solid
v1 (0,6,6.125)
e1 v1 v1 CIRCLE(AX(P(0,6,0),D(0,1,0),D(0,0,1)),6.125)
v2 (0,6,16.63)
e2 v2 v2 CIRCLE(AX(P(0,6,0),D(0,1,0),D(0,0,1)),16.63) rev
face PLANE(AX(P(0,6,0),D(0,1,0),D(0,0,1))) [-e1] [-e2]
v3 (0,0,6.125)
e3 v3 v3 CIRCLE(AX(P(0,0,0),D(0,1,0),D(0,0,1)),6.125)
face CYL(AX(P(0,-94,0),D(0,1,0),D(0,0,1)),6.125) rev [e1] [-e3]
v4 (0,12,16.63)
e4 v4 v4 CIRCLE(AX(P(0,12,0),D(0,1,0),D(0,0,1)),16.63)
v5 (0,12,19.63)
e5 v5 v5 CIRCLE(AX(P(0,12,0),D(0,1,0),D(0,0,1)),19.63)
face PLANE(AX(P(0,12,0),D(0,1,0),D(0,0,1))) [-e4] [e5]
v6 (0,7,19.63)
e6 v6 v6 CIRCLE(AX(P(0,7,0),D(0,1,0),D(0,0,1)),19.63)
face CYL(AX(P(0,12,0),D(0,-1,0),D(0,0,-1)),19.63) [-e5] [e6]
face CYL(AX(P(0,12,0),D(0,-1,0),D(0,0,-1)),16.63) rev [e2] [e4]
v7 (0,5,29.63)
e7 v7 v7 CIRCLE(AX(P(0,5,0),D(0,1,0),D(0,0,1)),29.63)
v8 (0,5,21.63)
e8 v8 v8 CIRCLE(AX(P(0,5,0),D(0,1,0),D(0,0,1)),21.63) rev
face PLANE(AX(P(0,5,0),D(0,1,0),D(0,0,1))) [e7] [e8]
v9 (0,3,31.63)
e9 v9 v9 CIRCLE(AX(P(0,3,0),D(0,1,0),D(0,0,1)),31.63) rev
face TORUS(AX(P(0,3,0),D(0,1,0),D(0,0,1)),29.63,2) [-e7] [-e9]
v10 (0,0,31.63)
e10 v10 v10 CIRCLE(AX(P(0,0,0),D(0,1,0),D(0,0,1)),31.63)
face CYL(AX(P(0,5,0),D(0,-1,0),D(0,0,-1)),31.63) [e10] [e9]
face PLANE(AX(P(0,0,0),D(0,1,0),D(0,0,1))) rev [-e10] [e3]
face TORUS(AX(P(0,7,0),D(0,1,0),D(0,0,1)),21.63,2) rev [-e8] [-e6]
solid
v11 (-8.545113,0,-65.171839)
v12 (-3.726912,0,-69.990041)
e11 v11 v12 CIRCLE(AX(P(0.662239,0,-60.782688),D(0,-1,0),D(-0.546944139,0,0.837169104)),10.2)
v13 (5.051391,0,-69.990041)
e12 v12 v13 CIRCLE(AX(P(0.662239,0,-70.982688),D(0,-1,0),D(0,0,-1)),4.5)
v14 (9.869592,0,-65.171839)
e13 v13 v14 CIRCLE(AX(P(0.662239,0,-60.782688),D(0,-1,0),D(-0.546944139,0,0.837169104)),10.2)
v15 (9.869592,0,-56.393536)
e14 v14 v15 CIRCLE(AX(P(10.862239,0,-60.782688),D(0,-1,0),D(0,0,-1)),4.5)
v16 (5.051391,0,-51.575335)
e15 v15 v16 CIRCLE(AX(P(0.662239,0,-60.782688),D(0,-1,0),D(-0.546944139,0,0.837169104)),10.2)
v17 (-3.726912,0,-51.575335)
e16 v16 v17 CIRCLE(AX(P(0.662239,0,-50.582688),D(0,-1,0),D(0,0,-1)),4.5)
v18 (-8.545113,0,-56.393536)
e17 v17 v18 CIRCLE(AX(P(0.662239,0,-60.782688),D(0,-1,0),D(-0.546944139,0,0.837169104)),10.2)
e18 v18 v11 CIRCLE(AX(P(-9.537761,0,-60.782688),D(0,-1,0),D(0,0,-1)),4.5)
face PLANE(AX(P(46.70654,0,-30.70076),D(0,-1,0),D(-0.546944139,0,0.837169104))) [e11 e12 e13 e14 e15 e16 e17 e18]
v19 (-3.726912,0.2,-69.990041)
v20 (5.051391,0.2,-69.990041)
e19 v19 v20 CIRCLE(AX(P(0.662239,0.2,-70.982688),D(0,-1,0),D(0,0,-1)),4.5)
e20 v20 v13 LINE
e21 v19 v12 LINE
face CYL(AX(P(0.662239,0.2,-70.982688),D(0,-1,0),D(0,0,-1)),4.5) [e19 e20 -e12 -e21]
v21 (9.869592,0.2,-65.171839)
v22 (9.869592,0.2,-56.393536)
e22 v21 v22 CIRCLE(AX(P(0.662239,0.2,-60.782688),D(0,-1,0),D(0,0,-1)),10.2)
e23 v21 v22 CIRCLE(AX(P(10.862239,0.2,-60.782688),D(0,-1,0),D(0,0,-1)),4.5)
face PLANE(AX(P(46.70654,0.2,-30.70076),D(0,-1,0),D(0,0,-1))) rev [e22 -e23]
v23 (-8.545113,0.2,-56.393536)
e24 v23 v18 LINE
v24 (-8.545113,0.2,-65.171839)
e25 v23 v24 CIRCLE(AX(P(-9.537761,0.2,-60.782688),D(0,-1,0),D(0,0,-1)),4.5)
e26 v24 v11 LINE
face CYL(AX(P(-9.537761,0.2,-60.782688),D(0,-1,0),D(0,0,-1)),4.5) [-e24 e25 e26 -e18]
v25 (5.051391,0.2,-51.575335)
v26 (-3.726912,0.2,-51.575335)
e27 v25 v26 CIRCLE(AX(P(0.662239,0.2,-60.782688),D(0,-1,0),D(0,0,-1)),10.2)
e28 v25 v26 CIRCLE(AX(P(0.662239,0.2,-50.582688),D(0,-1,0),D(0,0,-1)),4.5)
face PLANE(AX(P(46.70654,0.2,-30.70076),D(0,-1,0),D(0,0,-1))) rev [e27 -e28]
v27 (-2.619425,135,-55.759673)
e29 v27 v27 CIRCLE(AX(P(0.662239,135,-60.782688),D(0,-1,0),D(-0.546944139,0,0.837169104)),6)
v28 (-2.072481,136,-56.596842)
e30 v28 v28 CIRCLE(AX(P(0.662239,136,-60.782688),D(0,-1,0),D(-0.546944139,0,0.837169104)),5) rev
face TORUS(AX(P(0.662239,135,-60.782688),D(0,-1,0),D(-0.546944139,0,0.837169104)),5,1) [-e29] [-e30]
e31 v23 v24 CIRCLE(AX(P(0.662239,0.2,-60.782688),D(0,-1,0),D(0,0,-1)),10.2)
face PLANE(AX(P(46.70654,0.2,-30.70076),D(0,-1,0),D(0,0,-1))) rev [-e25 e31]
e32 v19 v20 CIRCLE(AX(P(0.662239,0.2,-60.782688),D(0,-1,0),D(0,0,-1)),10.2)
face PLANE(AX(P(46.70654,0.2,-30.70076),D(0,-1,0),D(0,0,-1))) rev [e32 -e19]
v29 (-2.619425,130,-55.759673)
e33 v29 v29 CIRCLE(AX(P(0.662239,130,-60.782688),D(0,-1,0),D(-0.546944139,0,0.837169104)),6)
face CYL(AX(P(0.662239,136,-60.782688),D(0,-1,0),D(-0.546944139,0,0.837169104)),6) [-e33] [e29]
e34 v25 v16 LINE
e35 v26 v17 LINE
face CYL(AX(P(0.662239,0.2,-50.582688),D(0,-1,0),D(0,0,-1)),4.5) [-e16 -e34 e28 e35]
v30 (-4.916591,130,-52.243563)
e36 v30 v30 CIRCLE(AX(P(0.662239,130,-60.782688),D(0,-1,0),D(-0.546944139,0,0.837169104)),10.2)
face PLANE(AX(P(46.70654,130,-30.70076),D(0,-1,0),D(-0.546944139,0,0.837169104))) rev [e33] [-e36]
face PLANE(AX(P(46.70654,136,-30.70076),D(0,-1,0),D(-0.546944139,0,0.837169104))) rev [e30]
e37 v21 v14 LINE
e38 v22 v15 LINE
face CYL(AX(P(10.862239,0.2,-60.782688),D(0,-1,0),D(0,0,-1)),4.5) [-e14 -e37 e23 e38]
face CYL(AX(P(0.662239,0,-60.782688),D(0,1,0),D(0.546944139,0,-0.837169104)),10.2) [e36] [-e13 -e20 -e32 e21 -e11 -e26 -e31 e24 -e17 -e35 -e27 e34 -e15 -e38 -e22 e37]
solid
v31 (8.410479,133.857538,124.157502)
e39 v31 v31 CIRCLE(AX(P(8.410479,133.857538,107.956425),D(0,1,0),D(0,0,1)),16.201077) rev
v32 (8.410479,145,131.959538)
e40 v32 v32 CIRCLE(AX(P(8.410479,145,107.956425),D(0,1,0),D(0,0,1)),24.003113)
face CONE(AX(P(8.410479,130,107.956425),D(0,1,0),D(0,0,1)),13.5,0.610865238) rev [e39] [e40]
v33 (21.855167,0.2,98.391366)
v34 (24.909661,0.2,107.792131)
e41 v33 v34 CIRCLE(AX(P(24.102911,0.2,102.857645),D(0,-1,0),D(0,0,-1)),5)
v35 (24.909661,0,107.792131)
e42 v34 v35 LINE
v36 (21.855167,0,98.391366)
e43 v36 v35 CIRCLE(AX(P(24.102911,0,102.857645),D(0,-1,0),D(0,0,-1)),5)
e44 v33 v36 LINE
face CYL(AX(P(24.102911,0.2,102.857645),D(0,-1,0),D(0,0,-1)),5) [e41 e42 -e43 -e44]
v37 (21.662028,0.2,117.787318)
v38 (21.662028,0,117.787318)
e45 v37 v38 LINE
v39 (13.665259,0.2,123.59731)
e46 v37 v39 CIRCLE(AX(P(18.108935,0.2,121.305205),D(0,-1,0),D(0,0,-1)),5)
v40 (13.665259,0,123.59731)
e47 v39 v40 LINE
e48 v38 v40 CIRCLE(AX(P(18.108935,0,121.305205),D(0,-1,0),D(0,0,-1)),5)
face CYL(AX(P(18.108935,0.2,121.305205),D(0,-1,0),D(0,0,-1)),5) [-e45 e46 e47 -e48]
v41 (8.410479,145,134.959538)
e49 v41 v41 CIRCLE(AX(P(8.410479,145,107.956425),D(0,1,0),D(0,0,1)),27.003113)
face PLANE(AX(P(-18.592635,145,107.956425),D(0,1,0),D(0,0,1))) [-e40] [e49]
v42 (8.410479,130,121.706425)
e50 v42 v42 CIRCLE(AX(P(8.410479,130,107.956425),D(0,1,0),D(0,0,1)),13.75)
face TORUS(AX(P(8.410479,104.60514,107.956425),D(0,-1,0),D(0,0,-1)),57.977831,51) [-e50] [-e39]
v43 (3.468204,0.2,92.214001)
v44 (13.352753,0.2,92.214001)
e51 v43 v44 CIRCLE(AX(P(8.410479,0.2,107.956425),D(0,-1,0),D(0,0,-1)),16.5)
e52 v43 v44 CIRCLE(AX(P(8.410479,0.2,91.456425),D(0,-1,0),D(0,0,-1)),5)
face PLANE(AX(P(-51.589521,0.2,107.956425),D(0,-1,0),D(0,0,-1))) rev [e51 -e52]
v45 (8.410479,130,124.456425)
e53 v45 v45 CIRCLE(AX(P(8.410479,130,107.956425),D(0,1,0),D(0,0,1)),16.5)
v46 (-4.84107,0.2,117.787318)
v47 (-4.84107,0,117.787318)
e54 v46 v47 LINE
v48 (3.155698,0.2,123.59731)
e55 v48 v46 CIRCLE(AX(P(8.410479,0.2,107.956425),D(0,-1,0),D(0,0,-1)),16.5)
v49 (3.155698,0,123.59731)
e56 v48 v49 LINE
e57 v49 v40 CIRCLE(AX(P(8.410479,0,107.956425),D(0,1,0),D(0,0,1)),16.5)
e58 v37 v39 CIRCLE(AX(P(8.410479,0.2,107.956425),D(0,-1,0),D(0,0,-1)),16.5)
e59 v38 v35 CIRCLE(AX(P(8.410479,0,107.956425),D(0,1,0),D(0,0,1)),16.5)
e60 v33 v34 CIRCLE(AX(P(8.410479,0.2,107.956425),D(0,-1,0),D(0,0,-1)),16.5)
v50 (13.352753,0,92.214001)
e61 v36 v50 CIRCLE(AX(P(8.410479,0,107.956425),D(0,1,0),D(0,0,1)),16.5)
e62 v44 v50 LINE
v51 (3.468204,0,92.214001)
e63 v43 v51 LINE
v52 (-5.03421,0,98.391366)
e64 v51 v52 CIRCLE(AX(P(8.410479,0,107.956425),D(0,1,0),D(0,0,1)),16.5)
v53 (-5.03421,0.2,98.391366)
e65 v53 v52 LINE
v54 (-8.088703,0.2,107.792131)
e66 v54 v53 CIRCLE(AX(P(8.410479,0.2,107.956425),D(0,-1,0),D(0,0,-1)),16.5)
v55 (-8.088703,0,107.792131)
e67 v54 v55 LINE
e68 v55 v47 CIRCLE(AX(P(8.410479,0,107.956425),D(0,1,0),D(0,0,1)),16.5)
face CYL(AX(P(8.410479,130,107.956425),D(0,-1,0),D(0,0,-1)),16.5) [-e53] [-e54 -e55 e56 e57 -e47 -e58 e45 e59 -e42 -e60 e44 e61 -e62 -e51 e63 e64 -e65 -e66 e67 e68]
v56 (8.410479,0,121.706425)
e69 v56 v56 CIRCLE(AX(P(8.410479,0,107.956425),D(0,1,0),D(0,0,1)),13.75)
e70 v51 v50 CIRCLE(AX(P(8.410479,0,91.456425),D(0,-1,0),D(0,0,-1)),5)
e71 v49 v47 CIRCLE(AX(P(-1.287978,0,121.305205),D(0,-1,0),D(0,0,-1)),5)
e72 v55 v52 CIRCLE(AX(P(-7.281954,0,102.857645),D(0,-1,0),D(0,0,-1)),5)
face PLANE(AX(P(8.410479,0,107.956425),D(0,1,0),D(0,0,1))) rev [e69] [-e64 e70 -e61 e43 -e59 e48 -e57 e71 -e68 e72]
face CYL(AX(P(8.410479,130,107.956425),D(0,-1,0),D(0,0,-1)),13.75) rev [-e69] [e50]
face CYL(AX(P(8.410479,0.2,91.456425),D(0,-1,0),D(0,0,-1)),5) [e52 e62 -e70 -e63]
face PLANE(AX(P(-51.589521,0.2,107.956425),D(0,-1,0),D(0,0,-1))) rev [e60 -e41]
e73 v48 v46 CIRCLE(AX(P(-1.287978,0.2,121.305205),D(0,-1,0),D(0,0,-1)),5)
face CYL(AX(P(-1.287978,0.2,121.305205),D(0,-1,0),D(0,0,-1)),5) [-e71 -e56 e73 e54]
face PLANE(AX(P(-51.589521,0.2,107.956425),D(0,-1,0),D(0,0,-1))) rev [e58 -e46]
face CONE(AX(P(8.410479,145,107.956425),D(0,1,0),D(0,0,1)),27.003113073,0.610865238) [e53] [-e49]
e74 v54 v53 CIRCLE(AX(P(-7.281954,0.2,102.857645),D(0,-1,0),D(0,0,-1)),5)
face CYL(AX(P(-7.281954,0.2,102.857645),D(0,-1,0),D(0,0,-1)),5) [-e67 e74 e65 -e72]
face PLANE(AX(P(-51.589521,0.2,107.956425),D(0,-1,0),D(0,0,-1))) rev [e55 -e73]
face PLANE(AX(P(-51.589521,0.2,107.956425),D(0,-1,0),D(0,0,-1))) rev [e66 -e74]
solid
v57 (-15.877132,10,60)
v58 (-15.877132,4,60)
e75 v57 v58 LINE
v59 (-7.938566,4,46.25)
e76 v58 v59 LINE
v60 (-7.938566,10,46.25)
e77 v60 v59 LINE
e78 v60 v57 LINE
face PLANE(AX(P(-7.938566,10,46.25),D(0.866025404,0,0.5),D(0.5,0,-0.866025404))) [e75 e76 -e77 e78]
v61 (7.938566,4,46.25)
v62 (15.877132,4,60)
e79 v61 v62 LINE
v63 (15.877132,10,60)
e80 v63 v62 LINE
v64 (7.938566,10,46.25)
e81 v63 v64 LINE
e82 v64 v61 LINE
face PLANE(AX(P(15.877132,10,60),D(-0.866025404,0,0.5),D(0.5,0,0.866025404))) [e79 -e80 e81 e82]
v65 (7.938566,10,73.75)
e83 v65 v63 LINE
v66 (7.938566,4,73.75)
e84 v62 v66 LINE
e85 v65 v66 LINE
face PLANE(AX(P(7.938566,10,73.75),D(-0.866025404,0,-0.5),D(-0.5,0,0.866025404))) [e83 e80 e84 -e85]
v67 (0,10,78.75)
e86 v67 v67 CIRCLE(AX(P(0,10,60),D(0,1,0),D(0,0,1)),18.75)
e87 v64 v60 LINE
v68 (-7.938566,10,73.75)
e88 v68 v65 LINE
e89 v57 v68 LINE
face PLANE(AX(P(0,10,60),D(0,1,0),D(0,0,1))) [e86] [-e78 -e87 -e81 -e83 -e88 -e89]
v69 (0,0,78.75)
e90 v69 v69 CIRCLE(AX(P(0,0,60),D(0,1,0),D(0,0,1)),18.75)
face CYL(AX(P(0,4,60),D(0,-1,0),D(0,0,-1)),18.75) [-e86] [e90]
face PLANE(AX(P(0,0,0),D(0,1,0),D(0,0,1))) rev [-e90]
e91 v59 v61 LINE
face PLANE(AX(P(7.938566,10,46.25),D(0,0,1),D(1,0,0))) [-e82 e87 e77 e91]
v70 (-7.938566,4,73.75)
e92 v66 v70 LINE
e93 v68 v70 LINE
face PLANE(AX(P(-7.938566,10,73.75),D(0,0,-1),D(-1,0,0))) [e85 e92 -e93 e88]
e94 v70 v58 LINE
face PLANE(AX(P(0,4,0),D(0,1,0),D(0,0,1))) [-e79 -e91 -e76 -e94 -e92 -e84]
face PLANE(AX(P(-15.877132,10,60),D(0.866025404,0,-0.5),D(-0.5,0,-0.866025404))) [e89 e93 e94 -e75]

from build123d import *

# Parameters (mm, degrees)
SKETCH1_R             = 16.63
BOSS_EXTRUDE1_DEPTH   = 6
SKETCH1_3_R           = 19.63
SKETCH1_3_R_2         = 16.63
BOSS_EXTRUDE2_DEPTH   = 12
SKETCH1_4_R           = 31.63
SKETCH1_4_R_2         = 19.63
BOSS_EXTRUDE3_DEPTH   = 5
FILLET1_R             = 2
SKETCH2_R             = 16.499999999999993
SKETCH2_R_2           = 13.75
BOSS_EXTRUDE4_DEPTH   = 130
SKETCH3_R             = 6.125
CUT_EXTRUDE1_DEPTH    = 100
SKETCH4_R             = 10.19999999999999
BOSS_EXTRUDE5_DEPTH   = 130.00000000000003
SKETCH4_3_R           = 5.999999999999995
BOSS_EXTRUDE6_DEPTH   = 6
FILLET3_R             = 1
BODY_MOVE_COPY1_ANGLE = 180
BOSS_EXTRUDE7_DEPTH   = 0.2
SKETCH6_R             = 4.499999999999998
SKETCH6_R_2           = 10.19999999999999
SKETCH6_R_3           = 4.500000000000004
SKETCH6_R_4           = 10.200000000000001
SKETCH6_R_5           = 4.500000000000005
BOSS_EXTRUDE8_DEPTH   = 0.2
FILLET4_R             = 51
SKETCH11_R            = 18.750000000000004
BOSS_EXTRUDE11_DEPTH  = 4
SKETCH11_3_R          = 18.750000000000004
BOSS_EXTRUDE12_DEPTH  = 10


with BuildPart() as part:
    # Sketch1 → Boss-Extrude1 (new body)
    with BuildSketch(Plane(origin=(0, 0, 0), x_dir=(1, 0, 0), z_dir=(0, 1, 0))):
        with Locations(Location((0, 0, 0), (0, 0, 270))):
            Circle(SKETCH1_R)
    extrude(amount=BOSS_EXTRUDE1_DEPTH)

    # Sketch1<3> → Boss-Extrude2 (add)
    with BuildSketch(Plane(origin=(0, 0, 0), x_dir=(1, 0, 0), z_dir=(0, 1, 0))):
        with Locations(Location((0, 0, 0), (0, 0, 270))):
            Circle(SKETCH1_3_R)
        with Locations(Location((0, 0, 0), (0, 0, 270))):
            Circle(SKETCH1_3_R_2, mode=Mode.SUBTRACT)
    extrude(amount=BOSS_EXTRUDE2_DEPTH)

    # Sketch1<4> → Boss-Extrude3 (add)
    with BuildSketch(Plane(origin=(0, 0, 0), x_dir=(1, 0, 0), z_dir=(0, 1, 0))):
        with Locations(Location((0, 0, 0), (0, 0, 270))):
            Circle(SKETCH1_4_R)
        with Locations(Location((0, 0, 0), (0, 0, 270))):
            Circle(SKETCH1_4_R_2, mode=Mode.SUBTRACT)
    extrude(amount=BOSS_EXTRUDE3_DEPTH)

    # Fillet1
    fillet1_edges = [part.edges().sort_by_distance(p)[0] for p in [
        (6.01e-15, 5, -19.63),
        (9.68e-15, 5, -31.63),
    ]]
    fillet(fillet1_edges, radius=FILLET1_R)

    # Sketch3 → Cut-Extrude1 (cut)
    with BuildSketch(Plane(origin=(0, 6, 0), x_dir=(1, 0, 0), z_dir=(0, 1, 0))):
        with Locations(Location((0, 0, 0), (0, 0, 270))):
            Circle(SKETCH3_R)
    extrude(amount=-CUT_EXTRUDE1_DEPTH, mode=Mode.SUBTRACT)


with BuildPart() as body_2:
    # Sketch2 → Boss-Extrude4 (new body)
    with BuildSketch(Plane(origin=(0, 0, 0), x_dir=(1, 0, 0), z_dir=(0, 1, 0))):
        with Locations(Location((60, 0, 0), (0, 0, 270))):
            Circle(SKETCH2_R)
        with Locations(Location((60, 0, 0), (0, 0, 270))):
            Circle(SKETCH2_R_2, mode=Mode.SUBTRACT)
    extrude(amount=BOSS_EXTRUDE4_DEPTH)

    # Sketch5 → Boss-Extrude7 (add)
    with BuildSketch(Plane.XZ):
        with BuildLine():
            ThreePointArc((65.25478060139801, 15.640884912023708), (69.69845666282565, 13.348780407186739), (73.25154900865867, 9.830892577539284))
            ThreePointArc((73.25154900865891, 9.830892577539114), (72.6373829242881, 17.393865379061403), (65.25478060139807, 15.640884912023665))
        make_face()
        with BuildLine():
            ThreePointArc((73.44468829233415, -9.565059159355442), (80.44771510034582, -6.643865379061353), (76.49918202374636, -0.16429408778297105))
            ThreePointArc((76.4991820237465, -0.16429408778252608), (75.69243251887004, -5.0987804071865925), (73.444688292334, -9.565059159355814))
        make_face()
        with BuildLine():
            ThreePointArc((46.74845099134144, 9.83089257753945), (50.30154333717442, 13.348780407186792), (54.74521939860196, 15.640884912023699))
            ThreePointArc((54.74521939860191, 15.640884912023663), (47.3626170757119, 17.393865379061413), (46.74845099134104, 9.830892577539155))
        make_face()
        with BuildLine():
            ThreePointArc((55.05772532415149, -15.74242424242421), (60, -21.499999999999996), (64.94227467584851, -15.742424242424214))
            ThreePointArc((64.94227467584858, -15.742424242424216), (60, -16.499999999999993), (55.057725324151406, -15.74242424242421))
        make_face()
        with BuildLine():
            ThreePointArc((46.55531170766575, -9.565059159355473), (44.30756748112995, -5.098780407186559), (43.50081797625351, -0.1642940877828717))
            ThreePointArc((43.50081797625355, -0.16429408778300125), (39.55228489965419, -6.643865379061347), (46.555311707665744, -9.565059159355496))
        make_face()
    extrude(amount=-BOSS_EXTRUDE7_DEPTH)

    # Sketch10 → Revolve1 (revolve)
    with BuildSketch(Plane.XY, mode=Mode.PRIVATE) as revolve1_sk:
        Polygon((43.50000000000001, 130), (32.99688692685439, 145.00000000000003), (35.996886926854394, 145.00000000000003), (46.50000000000001, 130), align=None)
    revolve(revolve1_sk.sketch.rotate(Axis((60, 130, 0), (0, -1, 0)), 270), axis=Axis((60, 130, 0), (0, -1, 0)))

    # Fillet4
    # the kernel refuses this fillet: 51 mm, written as the material it takes off along each edge
    with BuildSketch(Plane(origin=(60, 130, 0), x_dir=(5.3e-16, 0, 1), z_dir=(1, 0, -5.3e-16))) as fillet4_piece_1:
        with BuildLine():
            CenterArc((57.97783134059824, 25.39486040338865), FILLET4_R, 209.8637017104066, 5.136298289593242)
            Line((13.75, 0), (13.499999999999993, 0))
            Line((13.499999999999993, 0), (16.201077081859587, -3.8575378505146034))
        make_face()
    revolve(axis=Axis((60, 130, 0), (0, -1, 0)), mode=Mode.SUBTRACT)


with BuildPart() as body_3:
    # Sketch4 → Boss-Extrude5 (new body)
    with BuildSketch(Plane(origin=(0, 0, 0), x_dir=(1, 0, 0), z_dir=(0, 1, 0))):
        with Locations(Location((55, 0, 0), (0, 0, 270))):
            Circle(SKETCH4_R)
    extrude(amount=BOSS_EXTRUDE5_DEPTH)

    # Sketch4<3> → Boss-Extrude6 (add)
    with BuildSketch(Plane(origin=(0, 0, 0), x_dir=(1, 0, 0), z_dir=(0, 1, 0))):
        with Locations(Location((55, 0, 0), (0, 0, 270))):
            Circle(SKETCH4_3_R)
    extrude(amount=-BOSS_EXTRUDE6_DEPTH)

    # Fillet3
    fillet3_edges = [body_3.edges().sort_by_distance(p)[0] for p in [
        (55, -6, -5.999999999999995),
    ]]
    fillet(fillet3_edges, radius=FILLET3_R)


with BuildPart() as body_3_1:
    # Body-Move/Copy1: read off the stored shape, not the designer's step
    # Body-Move/Copy1: moved
    add(body_3.part.moved(Location((0, -130, 0))).rotate(Axis((0, 0, 0), (0.2853339234, 0, -0.9584281675)), BODY_MOVE_COPY1_ANGLE))

    # Sketch6 → Boss-Extrude8 (add)
    with BuildSketch(Plane.XZ):
        with Locations((-46.04430073821723, -19.881927623219386)):
            Circle(SKETCH6_R)
        with Locations(Location((-46.04430073821723, -30.08192762321938, 0), (0, 0, 295.487170444))):
            Circle(SKETCH6_R_2)
        with Locations((-35.84430073821724, -30.08192762321938)):
            Circle(SKETCH6_R_3)
        with Locations(Location((-46.04430073821723, -30.08192762321938, 0), (0, 0, 295.487170444))):
            Circle(SKETCH6_R_2)
        with Locations(Location((-46.04430073821723, -30.08192762321938, 0), (0, 0, 295.487170444))):
            Circle(SKETCH6_R_4)
        with Locations((-46.04430073821723, -40.281927623219374)):
            Circle(SKETCH6_R_5)
        with Locations(Location((-46.04430073821723, -30.08192762321938, 0), (0, 0, 295.487170444))):
            Circle(SKETCH6_R_4)
        with Locations((-56.24430073821722, -30.081927623219375)):
            Circle(SKETCH6_R)
    extrude(amount=-BOSS_EXTRUDE8_DEPTH)


with BuildPart() as body_4:
    # Sketch11 → Boss-Extrude11 (new body)
    # profile 1 of 2: a face of its own
    with BuildSketch(Plane(origin=(0, 0, 0), x_dir=(1, 0, 0), z_dir=(0, 1, 0))):
        with Locations(Location((0, -60, 0), (0, 0, 270))):
            Circle(SKETCH11_R)
        Polygon((-7.938566201357354, -73.75), (7.938566201357352, -73.75), (15.877132402714707, -59.99999999999999), (7.93856620135735, -46.24999999999999), (-7.938566201357352, -46.24999999999999), (-15.877132402714711, -60), align=None, mode=Mode.SUBTRACT)
    # profile 2 of 2: a face of its own
    with BuildSketch(Plane(origin=(0, 0, 0), x_dir=(1, 0, 0), z_dir=(0, 1, 0))):
        Polygon((-15.877132402714711, -60), (-7.938566201357354, -73.75), (7.938566201357352, -73.75), (15.877132402714707, -59.99999999999999), (7.93856620135735, -46.24999999999999), (-7.938566201357352, -46.24999999999999), align=None)
    extrude(amount=BOSS_EXTRUDE11_DEPTH)

    # Sketch11<3> → Boss-Extrude12 (add)
    with BuildSketch(Plane(origin=(0, 0, 0), x_dir=(1, 0, 0), z_dir=(0, 1, 0))):
        with Locations(Location((0, -60, 0), (0, 0, 270))):
            Circle(SKETCH11_3_R)
        Polygon((7.938566201357352, -73.75), (15.877132402714707, -59.99999999999999), (7.93856620135735, -46.24999999999999), (-7.938566201357352, -46.24999999999999), (-15.877132402714711, -60), (-7.938566201357354, -73.75), align=None, mode=Mode.SUBTRACT)
    extrude(amount=BOSS_EXTRUDE12_DEPTH)


with BuildPart() as body_3_2:
    # Body-Move/Copy3: moved
    add(body_3_1.part.moved(Location((46.70654023283633, 0, -30.700759974247646))))


with BuildPart() as body_2_1:
    # Body-Move/Copy4: moved
    add(body_2.part.moved(Location((-51.58952146507627, 0, 107.95642508673633))))


solid = Compound([part.part, body_4.part, body_3_2.part, body_2_1.part])
